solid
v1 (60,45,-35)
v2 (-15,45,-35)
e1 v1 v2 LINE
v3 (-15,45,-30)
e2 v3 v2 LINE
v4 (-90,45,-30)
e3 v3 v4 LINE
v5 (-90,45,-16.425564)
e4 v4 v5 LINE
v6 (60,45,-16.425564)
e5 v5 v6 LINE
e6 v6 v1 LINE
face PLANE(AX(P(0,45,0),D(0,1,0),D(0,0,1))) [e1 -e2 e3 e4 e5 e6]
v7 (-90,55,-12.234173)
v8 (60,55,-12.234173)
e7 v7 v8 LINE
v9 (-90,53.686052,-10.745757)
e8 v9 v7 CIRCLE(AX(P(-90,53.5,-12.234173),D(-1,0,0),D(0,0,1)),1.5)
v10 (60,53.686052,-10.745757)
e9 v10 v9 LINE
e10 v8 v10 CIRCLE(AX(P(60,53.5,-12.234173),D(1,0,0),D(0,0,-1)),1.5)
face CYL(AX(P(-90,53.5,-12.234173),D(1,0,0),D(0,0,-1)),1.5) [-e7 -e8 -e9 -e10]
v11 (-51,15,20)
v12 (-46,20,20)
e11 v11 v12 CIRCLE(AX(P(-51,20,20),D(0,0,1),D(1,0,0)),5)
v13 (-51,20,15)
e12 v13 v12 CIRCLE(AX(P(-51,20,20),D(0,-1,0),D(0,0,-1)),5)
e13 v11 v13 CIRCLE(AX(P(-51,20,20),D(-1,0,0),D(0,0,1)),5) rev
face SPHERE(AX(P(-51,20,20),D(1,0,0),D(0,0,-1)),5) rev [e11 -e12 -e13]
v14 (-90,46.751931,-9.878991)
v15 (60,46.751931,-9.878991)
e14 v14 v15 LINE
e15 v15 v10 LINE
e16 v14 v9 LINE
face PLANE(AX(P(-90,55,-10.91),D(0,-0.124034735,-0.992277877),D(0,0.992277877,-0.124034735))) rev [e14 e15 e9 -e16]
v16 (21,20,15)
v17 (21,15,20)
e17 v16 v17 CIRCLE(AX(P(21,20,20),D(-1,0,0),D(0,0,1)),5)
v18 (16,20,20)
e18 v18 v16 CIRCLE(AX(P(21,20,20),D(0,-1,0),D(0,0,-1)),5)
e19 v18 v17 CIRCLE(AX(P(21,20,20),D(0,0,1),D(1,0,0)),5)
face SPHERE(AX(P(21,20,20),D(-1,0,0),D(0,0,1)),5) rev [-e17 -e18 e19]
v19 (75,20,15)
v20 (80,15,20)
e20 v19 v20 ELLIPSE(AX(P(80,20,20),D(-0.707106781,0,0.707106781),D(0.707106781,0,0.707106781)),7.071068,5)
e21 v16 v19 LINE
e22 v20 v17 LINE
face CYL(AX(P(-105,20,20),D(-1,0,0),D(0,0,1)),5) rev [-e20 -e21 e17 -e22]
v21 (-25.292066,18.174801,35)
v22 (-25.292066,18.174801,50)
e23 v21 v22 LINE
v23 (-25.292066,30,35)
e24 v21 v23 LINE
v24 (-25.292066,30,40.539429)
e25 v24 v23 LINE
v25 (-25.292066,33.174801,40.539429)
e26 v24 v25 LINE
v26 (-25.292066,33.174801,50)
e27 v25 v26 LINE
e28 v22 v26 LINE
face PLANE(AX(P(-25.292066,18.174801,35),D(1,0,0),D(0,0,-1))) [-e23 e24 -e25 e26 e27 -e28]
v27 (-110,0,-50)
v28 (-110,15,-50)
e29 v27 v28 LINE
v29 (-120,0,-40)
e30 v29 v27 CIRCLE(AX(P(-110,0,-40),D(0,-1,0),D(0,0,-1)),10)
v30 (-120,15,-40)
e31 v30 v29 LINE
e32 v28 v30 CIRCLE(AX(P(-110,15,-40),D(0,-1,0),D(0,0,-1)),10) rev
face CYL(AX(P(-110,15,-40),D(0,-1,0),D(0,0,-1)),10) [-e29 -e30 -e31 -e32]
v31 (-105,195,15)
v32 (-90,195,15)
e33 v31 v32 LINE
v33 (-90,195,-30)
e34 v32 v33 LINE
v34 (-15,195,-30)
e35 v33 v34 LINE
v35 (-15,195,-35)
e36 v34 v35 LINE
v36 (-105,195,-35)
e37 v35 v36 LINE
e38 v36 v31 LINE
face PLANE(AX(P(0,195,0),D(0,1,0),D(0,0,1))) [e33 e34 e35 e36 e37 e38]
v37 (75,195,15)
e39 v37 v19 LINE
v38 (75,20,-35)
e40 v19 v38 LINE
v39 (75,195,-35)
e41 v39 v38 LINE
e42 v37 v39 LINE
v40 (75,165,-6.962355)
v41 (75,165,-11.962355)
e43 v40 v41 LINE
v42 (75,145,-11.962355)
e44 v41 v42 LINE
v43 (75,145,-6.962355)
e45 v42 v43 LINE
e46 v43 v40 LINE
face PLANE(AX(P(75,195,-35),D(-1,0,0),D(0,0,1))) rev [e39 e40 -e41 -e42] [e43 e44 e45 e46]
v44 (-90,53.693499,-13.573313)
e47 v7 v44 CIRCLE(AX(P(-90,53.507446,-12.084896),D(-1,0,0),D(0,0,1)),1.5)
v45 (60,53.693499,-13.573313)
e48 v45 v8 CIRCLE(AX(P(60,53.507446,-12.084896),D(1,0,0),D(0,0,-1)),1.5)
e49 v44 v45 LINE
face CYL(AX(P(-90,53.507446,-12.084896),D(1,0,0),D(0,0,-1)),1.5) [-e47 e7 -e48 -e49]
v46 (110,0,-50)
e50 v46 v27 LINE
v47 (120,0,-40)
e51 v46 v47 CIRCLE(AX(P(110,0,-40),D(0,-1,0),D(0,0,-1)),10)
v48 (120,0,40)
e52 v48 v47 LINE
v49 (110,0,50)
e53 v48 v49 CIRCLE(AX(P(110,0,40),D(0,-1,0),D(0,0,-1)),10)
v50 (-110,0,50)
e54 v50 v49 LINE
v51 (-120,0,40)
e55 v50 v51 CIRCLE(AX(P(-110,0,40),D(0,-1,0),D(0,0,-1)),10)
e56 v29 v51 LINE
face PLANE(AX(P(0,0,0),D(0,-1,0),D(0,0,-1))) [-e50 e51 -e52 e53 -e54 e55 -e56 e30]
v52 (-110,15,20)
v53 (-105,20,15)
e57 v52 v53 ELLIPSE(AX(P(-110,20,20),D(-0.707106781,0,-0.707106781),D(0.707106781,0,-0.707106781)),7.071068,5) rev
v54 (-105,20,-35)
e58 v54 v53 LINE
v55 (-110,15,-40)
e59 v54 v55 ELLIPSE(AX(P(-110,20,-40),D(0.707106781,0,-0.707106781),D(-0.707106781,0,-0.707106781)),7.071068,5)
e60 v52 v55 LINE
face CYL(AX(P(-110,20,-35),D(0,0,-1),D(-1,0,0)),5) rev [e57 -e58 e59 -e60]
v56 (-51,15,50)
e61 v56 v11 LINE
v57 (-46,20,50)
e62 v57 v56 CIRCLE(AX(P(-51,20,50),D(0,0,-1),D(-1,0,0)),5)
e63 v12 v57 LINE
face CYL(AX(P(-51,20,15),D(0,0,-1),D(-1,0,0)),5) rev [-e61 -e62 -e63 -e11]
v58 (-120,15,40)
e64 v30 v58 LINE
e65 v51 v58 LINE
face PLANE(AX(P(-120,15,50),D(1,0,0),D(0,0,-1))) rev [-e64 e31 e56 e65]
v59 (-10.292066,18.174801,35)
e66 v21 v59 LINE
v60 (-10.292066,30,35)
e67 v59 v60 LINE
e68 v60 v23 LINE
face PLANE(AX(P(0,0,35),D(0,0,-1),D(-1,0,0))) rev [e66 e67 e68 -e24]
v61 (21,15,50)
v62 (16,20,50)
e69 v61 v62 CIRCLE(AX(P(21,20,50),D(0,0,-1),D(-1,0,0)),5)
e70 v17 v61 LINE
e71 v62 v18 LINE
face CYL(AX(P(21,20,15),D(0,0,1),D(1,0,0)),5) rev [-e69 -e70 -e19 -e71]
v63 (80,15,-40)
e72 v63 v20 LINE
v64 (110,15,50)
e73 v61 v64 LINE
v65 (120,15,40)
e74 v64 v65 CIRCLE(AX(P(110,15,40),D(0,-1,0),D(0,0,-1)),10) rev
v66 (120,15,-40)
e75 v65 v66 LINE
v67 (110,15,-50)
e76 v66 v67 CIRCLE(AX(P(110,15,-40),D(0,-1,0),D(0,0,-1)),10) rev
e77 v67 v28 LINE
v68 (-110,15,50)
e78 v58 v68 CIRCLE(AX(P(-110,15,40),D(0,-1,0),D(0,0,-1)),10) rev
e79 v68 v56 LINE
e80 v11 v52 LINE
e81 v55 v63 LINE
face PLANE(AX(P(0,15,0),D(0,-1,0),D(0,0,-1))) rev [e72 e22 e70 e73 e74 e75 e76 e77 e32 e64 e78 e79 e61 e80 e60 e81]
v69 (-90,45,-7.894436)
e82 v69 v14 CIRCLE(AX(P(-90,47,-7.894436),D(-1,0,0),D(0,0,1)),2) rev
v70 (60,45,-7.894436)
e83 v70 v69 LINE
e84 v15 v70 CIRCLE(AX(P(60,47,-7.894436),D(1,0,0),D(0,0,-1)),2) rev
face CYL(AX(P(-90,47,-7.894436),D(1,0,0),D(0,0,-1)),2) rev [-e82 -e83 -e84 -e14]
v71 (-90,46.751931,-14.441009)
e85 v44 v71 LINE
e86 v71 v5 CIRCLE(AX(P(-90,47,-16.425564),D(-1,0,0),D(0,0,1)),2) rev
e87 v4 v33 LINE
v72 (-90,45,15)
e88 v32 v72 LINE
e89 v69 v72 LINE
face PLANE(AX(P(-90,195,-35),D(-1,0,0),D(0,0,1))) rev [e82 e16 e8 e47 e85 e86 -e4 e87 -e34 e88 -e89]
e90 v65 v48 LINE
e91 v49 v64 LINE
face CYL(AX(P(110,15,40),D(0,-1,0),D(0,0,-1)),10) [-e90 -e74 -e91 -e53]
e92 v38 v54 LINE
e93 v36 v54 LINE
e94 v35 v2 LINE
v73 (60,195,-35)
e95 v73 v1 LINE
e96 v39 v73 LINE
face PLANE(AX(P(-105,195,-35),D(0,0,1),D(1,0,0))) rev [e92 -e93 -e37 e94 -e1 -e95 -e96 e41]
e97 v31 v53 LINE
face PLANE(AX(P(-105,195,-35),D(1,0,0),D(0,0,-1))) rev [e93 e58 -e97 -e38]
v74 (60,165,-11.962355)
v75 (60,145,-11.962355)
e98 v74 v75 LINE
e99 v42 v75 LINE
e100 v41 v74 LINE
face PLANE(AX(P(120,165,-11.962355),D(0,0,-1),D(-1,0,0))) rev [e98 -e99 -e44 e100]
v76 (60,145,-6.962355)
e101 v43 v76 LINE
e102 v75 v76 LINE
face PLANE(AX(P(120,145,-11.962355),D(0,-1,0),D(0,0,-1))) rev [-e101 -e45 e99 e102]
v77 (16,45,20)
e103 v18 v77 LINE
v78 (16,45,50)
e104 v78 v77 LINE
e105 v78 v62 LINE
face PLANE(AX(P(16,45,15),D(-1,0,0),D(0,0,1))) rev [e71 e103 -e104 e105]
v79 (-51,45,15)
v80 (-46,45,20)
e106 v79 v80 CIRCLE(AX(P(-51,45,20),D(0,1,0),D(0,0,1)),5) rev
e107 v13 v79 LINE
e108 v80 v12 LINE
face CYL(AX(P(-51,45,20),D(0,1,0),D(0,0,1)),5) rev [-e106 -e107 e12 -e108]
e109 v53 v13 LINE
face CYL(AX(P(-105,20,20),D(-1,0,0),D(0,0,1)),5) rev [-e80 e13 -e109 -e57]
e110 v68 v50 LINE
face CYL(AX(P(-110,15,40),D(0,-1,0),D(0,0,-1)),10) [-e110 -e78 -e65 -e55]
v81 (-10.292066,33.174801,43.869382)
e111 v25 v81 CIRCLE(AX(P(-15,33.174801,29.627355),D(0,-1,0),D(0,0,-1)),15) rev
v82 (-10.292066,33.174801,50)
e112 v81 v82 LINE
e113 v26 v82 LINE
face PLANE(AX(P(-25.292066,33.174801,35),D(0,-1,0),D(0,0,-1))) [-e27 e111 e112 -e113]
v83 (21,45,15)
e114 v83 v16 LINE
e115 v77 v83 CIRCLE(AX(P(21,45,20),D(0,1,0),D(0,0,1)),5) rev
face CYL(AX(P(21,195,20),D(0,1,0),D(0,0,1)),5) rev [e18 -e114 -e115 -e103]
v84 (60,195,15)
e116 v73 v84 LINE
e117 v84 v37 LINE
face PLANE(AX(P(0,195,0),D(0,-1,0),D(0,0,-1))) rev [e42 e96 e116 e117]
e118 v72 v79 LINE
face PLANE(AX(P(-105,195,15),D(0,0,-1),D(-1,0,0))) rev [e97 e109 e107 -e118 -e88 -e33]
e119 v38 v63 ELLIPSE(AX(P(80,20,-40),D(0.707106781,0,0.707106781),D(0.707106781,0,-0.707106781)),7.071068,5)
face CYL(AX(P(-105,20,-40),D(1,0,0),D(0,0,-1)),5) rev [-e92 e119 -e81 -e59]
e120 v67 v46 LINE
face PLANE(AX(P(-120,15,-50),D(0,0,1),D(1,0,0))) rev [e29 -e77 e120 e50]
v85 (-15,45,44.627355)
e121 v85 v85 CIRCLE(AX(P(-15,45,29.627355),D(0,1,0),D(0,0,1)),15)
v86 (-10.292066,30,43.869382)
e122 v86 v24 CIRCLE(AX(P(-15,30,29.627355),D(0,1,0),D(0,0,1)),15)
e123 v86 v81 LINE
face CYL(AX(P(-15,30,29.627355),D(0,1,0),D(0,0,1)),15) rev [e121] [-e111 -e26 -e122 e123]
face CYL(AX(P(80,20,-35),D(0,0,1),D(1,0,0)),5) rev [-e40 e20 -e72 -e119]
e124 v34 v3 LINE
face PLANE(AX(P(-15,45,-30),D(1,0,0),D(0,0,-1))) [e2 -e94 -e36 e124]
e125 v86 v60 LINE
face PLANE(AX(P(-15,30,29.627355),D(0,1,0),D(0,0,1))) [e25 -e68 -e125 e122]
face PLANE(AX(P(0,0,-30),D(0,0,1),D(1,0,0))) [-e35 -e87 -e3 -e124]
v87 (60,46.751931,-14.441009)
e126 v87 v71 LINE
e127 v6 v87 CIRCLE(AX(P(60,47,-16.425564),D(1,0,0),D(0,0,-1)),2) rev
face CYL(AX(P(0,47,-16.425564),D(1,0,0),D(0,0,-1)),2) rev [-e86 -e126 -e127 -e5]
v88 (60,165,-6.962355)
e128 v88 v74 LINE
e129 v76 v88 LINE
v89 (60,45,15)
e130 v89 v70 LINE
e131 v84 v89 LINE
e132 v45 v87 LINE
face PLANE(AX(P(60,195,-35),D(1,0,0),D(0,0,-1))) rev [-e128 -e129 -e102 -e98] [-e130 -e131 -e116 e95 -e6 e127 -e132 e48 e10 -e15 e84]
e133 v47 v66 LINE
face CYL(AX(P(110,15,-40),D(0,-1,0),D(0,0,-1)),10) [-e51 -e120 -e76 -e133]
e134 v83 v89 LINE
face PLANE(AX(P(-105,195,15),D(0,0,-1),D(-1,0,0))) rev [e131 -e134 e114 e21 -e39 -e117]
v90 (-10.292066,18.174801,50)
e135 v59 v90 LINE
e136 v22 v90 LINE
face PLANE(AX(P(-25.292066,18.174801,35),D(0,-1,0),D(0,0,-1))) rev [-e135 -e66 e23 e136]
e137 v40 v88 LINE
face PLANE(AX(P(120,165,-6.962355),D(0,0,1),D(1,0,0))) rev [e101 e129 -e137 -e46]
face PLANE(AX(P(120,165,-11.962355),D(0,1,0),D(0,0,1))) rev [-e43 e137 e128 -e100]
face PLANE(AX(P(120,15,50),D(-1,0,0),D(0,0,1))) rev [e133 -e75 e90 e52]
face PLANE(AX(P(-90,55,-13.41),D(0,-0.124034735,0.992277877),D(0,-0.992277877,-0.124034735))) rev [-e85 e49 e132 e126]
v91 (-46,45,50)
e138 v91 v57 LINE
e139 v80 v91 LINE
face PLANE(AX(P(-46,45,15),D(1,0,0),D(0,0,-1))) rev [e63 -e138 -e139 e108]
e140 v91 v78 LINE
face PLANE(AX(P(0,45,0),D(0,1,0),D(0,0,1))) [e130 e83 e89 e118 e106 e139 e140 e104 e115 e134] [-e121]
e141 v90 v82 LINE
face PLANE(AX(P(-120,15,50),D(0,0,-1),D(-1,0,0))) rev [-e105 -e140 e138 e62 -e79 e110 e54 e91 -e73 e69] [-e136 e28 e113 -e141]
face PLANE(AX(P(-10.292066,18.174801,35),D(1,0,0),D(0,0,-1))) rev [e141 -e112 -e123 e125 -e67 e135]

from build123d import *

# Parameters (mm, degrees)
SKETCH1_W            = 240
SKETCH1_H            = 100
BOSS_EXTRUDE1_DEPTH  = 15
SKETCH5_W            = 15
SKETCH5_H            = 50
BOSS_EXTRUDE4_DEPTH  = 180
SKETCH12_W           = 150
SKETCH12_H           = 50
BOSS_EXTRUDE7_DEPTH  = 30
FILLET1_R            = 5
FILLET4_R            = 5
FILLET10_R           = 5
BOSS_EXTRUDE8_DEPTH  = 30
SKETCH17_R           = 15
CUT_EXTRUDE1_DEPTH   = 15
SKETCH18_W           = 15
SKETCH18_H           = 15
CUT_EXTRUDE3_DEPTH   = 15
FILLET11_R           = 5
FILLET12_R           = 5
FILLET13_R           = 5
FILLET14_R           = 5
BOSS_EXTRUDE10_DEPTH = 150
FILLET19_R           = 1.5
FILLET20_R           = 1.5
SKETCH24_W           = 75
SKETCH24_H           = 150
BOSS_EXTRUDE11_DEPTH = 5
FILLET23_R           = 2
FILLET24_R           = 2
FILLET25_R           = 10
FILLET26_R           = 10
FILLET27_R           = 10
FILLET28_R           = 10
SKETCH25_W           = 5
SKETCH25_H           = 20
CUT_EXTRUDE4_DEPTH   = 271.046292328


with BuildPart() as part:
    # Sketch1 → Boss-Extrude1 (new body)
    with BuildSketch(Plane(origin=(0, 0, 0), x_dir=(1, 0, 0), z_dir=(0, 1, 0))):
        Rectangle(SKETCH1_W, SKETCH1_H)
    extrude(amount=BOSS_EXTRUDE1_DEPTH)

    # Sketch5 → Boss-Extrude4 (add)
    with BuildSketch(Plane(origin=(0, 15, 0), x_dir=(1, 0, 0), z_dir=(0, 1, 0))):
        with Locations((-97.5, 10)):
            Rectangle(SKETCH5_W, SKETCH5_H)
        with Locations((67.5, 10)):
            Rectangle(SKETCH5_W, SKETCH5_H)
    extrude(amount=BOSS_EXTRUDE4_DEPTH)

    # Sketch12 → Boss-Extrude7 (add)
    with BuildSketch(Plane(origin=(0, 15, 0), x_dir=(1, 0, 0), z_dir=(0, 1, 0))):
        with Locations((-15, 10)):
            Rectangle(SKETCH12_W, SKETCH12_H)
    extrude(amount=BOSS_EXTRUDE7_DEPTH)

    # Fillet1
    fillet1_edges = [part.edges().sort_by_distance(p)[0] for p in [
        (-105, 15, -10),
    ]]
    fillet(fillet1_edges, radius=FILLET1_R)

    # Fillet4
    fillet4_edges = [part.edges().sort_by_distance(p)[0] for p in [
        (-17.5, 15, -35),
    ]]
    fillet(fillet4_edges, radius=FILLET4_R)

    # Fillet10
    fillet10_edges = [part.edges().sort_by_distance(p)[0] for p in [
        (75, 15, -12.5),
    ]]
    fillet(fillet10_edges, radius=FILLET10_R)

    # Sketch15 → Boss-Extrude8 (add)
    with BuildSketch(Plane(origin=(0, 15, 0), x_dir=(1, 0, 0), z_dir=(0, 1, 0))):
        Polygon((-15, -15), (16, -15), (16, -50), (-46, -50), (-46, -15), align=None)
    extrude(amount=BOSS_EXTRUDE8_DEPTH)

    # Sketch17 → Cut-Extrude1 (cut)
    with BuildSketch(Plane(origin=(0, 45, 0), x_dir=(1, 0, 0), z_dir=(0, 1, 0))):
        with Locations(Location((-15, -29.627354627, 0), (0, 0, 270))):
            Circle(SKETCH17_R)
    extrude(amount=-CUT_EXTRUDE1_DEPTH, mode=Mode.SUBTRACT)

    # Sketch18 → Cut-Extrude3 (cut)
    with BuildSketch(Plane.XY.offset(50)):
        with Locations((-17.79206598, 25.674800875)):
            Rectangle(SKETCH18_W, SKETCH18_H)
    extrude(amount=-CUT_EXTRUDE3_DEPTH, mode=Mode.SUBTRACT)

    # Fillet11
    fillet11_edges = [part.edges().sort_by_distance(p)[0] for p in [
        (48, 15, 15),
    ]]
    fillet(fillet11_edges, radius=FILLET11_R)

    # Fillet12
    fillet12_edges = [part.edges().sort_by_distance(p)[0] for p in [
        (-78, 15, 15),
    ]]
    fillet(fillet12_edges, radius=FILLET12_R)

    # Fillet13
    fillet13_edges = [part.edges().sort_by_distance(p)[0] for p in [
        (16, 15, 35),
        (16, 32.5, 15),
        (16, 16.464466094, 16.464466094),
    ]]
    fillet(fillet13_edges, radius=FILLET13_R)

    # Fillet14
    fillet14_edges = [part.edges().sort_by_distance(p)[0] for p in [
        (-46, 32.5, 15),
        (-46, 15, 35),
        (-46, 16.464466094, 16.464466094),
    ]]
    fillet(fillet14_edges, radius=FILLET14_R)

    # Sketch23 → Boss-Extrude10 (add)
    with BuildSketch(Plane.ZY.offset(-60)):
        Polygon((-9.66, 45), (-14.66, 45), (-13.41, 55), (-10.91, 55), align=None)
    extrude(amount=BOSS_EXTRUDE10_DEPTH)

    # Fillet19
    fillet19_edges = [part.edges().sort_by_distance(p)[0] for p in [
        (-15, 55, -10.91),
    ]]
    fillet(fillet19_edges, radius=FILLET19_R)

    # Fillet20
    # the kernel refuses this fillet: 1.5 mm, written as the material it takes off along each edge
    with BuildSketch(Plane(origin=(60, 55, -13.41), x_dir=(0, 0, 1), z_dir=(-1, 0, 0))) as fillet20_piece_1:
        with BuildLine():
            CenterArc((1.325104128, -1.492553597), FILLET20_R, 95.711432961, 77.16355069)
            Line((-0.163312687, -1.306501496), (-0.193081023, -1.302780453))
            Line((-0.193081023, -1.302780453), (-0.029768336, 0.003721042))
            Line((-0.029768336, 0.003721042), (0, 0.03))
            ThreePointArc((0, 0.03), (0.587913336, 0.03), (1.172841123, 0.029851072))
            Line((1.172841123, 0.029851072), (1.175826672, 0))
        make_face()
    extrude(amount=150, mode=Mode.SUBTRACT)

    # Sketch24 → Boss-Extrude11 (add)
    with BuildSketch(Plane(origin=(0, 0, -35), x_dir=(-1, 0, 0), z_dir=(0, 0, -1))):
        with Locations((52.5, 120)):
            Rectangle(SKETCH24_W, SKETCH24_H)
    extrude(amount=-BOSS_EXTRUDE11_DEPTH)

    # Fillet23
    fillet23_edges = [part.edges().sort_by_distance(p)[0] for p in [
        (-15, 45, -9.66),
    ]]
    fillet(fillet23_edges, radius=FILLET23_R)

    # Fillet24
    fillet24_edges = [part.edges().sort_by_distance(p)[0] for p in [
        (-15, 45, -14.66),
    ]]
    fillet(fillet24_edges, radius=FILLET24_R)

    # Fillet25
    fillet25_edges = [part.edges().sort_by_distance(p)[0] for p in [
        (120, 7.5, 50),
    ]]
    fillet(fillet25_edges, radius=FILLET25_R)

    # Fillet26
    fillet26_edges = [part.edges().sort_by_distance(p)[0] for p in [
        (120, 7.5, -50),
    ]]
    fillet(fillet26_edges, radius=FILLET26_R)

    # Fillet27
    fillet27_edges = [part.edges().sort_by_distance(p)[0] for p in [
        (-120, 7.5, 50),
    ]]
    fillet(fillet27_edges, radius=FILLET27_R)

    # Fillet28
    fillet28_edges = [part.edges().sort_by_distance(p)[0] for p in [
        (-120, 7.5, -50),
    ]]
    fillet(fillet28_edges, radius=FILLET28_R)

    # Sketch25 → Cut-Extrude4 (cut, through all)
    with BuildSketch(Plane.ZY.offset(-60)):
        with Locations((-9.462355362, 155)):
            Rectangle(SKETCH25_W, SKETCH25_H)
    extrude(amount=-CUT_EXTRUDE4_DEPTH, mode=Mode.SUBTRACT)


solid = part.part
